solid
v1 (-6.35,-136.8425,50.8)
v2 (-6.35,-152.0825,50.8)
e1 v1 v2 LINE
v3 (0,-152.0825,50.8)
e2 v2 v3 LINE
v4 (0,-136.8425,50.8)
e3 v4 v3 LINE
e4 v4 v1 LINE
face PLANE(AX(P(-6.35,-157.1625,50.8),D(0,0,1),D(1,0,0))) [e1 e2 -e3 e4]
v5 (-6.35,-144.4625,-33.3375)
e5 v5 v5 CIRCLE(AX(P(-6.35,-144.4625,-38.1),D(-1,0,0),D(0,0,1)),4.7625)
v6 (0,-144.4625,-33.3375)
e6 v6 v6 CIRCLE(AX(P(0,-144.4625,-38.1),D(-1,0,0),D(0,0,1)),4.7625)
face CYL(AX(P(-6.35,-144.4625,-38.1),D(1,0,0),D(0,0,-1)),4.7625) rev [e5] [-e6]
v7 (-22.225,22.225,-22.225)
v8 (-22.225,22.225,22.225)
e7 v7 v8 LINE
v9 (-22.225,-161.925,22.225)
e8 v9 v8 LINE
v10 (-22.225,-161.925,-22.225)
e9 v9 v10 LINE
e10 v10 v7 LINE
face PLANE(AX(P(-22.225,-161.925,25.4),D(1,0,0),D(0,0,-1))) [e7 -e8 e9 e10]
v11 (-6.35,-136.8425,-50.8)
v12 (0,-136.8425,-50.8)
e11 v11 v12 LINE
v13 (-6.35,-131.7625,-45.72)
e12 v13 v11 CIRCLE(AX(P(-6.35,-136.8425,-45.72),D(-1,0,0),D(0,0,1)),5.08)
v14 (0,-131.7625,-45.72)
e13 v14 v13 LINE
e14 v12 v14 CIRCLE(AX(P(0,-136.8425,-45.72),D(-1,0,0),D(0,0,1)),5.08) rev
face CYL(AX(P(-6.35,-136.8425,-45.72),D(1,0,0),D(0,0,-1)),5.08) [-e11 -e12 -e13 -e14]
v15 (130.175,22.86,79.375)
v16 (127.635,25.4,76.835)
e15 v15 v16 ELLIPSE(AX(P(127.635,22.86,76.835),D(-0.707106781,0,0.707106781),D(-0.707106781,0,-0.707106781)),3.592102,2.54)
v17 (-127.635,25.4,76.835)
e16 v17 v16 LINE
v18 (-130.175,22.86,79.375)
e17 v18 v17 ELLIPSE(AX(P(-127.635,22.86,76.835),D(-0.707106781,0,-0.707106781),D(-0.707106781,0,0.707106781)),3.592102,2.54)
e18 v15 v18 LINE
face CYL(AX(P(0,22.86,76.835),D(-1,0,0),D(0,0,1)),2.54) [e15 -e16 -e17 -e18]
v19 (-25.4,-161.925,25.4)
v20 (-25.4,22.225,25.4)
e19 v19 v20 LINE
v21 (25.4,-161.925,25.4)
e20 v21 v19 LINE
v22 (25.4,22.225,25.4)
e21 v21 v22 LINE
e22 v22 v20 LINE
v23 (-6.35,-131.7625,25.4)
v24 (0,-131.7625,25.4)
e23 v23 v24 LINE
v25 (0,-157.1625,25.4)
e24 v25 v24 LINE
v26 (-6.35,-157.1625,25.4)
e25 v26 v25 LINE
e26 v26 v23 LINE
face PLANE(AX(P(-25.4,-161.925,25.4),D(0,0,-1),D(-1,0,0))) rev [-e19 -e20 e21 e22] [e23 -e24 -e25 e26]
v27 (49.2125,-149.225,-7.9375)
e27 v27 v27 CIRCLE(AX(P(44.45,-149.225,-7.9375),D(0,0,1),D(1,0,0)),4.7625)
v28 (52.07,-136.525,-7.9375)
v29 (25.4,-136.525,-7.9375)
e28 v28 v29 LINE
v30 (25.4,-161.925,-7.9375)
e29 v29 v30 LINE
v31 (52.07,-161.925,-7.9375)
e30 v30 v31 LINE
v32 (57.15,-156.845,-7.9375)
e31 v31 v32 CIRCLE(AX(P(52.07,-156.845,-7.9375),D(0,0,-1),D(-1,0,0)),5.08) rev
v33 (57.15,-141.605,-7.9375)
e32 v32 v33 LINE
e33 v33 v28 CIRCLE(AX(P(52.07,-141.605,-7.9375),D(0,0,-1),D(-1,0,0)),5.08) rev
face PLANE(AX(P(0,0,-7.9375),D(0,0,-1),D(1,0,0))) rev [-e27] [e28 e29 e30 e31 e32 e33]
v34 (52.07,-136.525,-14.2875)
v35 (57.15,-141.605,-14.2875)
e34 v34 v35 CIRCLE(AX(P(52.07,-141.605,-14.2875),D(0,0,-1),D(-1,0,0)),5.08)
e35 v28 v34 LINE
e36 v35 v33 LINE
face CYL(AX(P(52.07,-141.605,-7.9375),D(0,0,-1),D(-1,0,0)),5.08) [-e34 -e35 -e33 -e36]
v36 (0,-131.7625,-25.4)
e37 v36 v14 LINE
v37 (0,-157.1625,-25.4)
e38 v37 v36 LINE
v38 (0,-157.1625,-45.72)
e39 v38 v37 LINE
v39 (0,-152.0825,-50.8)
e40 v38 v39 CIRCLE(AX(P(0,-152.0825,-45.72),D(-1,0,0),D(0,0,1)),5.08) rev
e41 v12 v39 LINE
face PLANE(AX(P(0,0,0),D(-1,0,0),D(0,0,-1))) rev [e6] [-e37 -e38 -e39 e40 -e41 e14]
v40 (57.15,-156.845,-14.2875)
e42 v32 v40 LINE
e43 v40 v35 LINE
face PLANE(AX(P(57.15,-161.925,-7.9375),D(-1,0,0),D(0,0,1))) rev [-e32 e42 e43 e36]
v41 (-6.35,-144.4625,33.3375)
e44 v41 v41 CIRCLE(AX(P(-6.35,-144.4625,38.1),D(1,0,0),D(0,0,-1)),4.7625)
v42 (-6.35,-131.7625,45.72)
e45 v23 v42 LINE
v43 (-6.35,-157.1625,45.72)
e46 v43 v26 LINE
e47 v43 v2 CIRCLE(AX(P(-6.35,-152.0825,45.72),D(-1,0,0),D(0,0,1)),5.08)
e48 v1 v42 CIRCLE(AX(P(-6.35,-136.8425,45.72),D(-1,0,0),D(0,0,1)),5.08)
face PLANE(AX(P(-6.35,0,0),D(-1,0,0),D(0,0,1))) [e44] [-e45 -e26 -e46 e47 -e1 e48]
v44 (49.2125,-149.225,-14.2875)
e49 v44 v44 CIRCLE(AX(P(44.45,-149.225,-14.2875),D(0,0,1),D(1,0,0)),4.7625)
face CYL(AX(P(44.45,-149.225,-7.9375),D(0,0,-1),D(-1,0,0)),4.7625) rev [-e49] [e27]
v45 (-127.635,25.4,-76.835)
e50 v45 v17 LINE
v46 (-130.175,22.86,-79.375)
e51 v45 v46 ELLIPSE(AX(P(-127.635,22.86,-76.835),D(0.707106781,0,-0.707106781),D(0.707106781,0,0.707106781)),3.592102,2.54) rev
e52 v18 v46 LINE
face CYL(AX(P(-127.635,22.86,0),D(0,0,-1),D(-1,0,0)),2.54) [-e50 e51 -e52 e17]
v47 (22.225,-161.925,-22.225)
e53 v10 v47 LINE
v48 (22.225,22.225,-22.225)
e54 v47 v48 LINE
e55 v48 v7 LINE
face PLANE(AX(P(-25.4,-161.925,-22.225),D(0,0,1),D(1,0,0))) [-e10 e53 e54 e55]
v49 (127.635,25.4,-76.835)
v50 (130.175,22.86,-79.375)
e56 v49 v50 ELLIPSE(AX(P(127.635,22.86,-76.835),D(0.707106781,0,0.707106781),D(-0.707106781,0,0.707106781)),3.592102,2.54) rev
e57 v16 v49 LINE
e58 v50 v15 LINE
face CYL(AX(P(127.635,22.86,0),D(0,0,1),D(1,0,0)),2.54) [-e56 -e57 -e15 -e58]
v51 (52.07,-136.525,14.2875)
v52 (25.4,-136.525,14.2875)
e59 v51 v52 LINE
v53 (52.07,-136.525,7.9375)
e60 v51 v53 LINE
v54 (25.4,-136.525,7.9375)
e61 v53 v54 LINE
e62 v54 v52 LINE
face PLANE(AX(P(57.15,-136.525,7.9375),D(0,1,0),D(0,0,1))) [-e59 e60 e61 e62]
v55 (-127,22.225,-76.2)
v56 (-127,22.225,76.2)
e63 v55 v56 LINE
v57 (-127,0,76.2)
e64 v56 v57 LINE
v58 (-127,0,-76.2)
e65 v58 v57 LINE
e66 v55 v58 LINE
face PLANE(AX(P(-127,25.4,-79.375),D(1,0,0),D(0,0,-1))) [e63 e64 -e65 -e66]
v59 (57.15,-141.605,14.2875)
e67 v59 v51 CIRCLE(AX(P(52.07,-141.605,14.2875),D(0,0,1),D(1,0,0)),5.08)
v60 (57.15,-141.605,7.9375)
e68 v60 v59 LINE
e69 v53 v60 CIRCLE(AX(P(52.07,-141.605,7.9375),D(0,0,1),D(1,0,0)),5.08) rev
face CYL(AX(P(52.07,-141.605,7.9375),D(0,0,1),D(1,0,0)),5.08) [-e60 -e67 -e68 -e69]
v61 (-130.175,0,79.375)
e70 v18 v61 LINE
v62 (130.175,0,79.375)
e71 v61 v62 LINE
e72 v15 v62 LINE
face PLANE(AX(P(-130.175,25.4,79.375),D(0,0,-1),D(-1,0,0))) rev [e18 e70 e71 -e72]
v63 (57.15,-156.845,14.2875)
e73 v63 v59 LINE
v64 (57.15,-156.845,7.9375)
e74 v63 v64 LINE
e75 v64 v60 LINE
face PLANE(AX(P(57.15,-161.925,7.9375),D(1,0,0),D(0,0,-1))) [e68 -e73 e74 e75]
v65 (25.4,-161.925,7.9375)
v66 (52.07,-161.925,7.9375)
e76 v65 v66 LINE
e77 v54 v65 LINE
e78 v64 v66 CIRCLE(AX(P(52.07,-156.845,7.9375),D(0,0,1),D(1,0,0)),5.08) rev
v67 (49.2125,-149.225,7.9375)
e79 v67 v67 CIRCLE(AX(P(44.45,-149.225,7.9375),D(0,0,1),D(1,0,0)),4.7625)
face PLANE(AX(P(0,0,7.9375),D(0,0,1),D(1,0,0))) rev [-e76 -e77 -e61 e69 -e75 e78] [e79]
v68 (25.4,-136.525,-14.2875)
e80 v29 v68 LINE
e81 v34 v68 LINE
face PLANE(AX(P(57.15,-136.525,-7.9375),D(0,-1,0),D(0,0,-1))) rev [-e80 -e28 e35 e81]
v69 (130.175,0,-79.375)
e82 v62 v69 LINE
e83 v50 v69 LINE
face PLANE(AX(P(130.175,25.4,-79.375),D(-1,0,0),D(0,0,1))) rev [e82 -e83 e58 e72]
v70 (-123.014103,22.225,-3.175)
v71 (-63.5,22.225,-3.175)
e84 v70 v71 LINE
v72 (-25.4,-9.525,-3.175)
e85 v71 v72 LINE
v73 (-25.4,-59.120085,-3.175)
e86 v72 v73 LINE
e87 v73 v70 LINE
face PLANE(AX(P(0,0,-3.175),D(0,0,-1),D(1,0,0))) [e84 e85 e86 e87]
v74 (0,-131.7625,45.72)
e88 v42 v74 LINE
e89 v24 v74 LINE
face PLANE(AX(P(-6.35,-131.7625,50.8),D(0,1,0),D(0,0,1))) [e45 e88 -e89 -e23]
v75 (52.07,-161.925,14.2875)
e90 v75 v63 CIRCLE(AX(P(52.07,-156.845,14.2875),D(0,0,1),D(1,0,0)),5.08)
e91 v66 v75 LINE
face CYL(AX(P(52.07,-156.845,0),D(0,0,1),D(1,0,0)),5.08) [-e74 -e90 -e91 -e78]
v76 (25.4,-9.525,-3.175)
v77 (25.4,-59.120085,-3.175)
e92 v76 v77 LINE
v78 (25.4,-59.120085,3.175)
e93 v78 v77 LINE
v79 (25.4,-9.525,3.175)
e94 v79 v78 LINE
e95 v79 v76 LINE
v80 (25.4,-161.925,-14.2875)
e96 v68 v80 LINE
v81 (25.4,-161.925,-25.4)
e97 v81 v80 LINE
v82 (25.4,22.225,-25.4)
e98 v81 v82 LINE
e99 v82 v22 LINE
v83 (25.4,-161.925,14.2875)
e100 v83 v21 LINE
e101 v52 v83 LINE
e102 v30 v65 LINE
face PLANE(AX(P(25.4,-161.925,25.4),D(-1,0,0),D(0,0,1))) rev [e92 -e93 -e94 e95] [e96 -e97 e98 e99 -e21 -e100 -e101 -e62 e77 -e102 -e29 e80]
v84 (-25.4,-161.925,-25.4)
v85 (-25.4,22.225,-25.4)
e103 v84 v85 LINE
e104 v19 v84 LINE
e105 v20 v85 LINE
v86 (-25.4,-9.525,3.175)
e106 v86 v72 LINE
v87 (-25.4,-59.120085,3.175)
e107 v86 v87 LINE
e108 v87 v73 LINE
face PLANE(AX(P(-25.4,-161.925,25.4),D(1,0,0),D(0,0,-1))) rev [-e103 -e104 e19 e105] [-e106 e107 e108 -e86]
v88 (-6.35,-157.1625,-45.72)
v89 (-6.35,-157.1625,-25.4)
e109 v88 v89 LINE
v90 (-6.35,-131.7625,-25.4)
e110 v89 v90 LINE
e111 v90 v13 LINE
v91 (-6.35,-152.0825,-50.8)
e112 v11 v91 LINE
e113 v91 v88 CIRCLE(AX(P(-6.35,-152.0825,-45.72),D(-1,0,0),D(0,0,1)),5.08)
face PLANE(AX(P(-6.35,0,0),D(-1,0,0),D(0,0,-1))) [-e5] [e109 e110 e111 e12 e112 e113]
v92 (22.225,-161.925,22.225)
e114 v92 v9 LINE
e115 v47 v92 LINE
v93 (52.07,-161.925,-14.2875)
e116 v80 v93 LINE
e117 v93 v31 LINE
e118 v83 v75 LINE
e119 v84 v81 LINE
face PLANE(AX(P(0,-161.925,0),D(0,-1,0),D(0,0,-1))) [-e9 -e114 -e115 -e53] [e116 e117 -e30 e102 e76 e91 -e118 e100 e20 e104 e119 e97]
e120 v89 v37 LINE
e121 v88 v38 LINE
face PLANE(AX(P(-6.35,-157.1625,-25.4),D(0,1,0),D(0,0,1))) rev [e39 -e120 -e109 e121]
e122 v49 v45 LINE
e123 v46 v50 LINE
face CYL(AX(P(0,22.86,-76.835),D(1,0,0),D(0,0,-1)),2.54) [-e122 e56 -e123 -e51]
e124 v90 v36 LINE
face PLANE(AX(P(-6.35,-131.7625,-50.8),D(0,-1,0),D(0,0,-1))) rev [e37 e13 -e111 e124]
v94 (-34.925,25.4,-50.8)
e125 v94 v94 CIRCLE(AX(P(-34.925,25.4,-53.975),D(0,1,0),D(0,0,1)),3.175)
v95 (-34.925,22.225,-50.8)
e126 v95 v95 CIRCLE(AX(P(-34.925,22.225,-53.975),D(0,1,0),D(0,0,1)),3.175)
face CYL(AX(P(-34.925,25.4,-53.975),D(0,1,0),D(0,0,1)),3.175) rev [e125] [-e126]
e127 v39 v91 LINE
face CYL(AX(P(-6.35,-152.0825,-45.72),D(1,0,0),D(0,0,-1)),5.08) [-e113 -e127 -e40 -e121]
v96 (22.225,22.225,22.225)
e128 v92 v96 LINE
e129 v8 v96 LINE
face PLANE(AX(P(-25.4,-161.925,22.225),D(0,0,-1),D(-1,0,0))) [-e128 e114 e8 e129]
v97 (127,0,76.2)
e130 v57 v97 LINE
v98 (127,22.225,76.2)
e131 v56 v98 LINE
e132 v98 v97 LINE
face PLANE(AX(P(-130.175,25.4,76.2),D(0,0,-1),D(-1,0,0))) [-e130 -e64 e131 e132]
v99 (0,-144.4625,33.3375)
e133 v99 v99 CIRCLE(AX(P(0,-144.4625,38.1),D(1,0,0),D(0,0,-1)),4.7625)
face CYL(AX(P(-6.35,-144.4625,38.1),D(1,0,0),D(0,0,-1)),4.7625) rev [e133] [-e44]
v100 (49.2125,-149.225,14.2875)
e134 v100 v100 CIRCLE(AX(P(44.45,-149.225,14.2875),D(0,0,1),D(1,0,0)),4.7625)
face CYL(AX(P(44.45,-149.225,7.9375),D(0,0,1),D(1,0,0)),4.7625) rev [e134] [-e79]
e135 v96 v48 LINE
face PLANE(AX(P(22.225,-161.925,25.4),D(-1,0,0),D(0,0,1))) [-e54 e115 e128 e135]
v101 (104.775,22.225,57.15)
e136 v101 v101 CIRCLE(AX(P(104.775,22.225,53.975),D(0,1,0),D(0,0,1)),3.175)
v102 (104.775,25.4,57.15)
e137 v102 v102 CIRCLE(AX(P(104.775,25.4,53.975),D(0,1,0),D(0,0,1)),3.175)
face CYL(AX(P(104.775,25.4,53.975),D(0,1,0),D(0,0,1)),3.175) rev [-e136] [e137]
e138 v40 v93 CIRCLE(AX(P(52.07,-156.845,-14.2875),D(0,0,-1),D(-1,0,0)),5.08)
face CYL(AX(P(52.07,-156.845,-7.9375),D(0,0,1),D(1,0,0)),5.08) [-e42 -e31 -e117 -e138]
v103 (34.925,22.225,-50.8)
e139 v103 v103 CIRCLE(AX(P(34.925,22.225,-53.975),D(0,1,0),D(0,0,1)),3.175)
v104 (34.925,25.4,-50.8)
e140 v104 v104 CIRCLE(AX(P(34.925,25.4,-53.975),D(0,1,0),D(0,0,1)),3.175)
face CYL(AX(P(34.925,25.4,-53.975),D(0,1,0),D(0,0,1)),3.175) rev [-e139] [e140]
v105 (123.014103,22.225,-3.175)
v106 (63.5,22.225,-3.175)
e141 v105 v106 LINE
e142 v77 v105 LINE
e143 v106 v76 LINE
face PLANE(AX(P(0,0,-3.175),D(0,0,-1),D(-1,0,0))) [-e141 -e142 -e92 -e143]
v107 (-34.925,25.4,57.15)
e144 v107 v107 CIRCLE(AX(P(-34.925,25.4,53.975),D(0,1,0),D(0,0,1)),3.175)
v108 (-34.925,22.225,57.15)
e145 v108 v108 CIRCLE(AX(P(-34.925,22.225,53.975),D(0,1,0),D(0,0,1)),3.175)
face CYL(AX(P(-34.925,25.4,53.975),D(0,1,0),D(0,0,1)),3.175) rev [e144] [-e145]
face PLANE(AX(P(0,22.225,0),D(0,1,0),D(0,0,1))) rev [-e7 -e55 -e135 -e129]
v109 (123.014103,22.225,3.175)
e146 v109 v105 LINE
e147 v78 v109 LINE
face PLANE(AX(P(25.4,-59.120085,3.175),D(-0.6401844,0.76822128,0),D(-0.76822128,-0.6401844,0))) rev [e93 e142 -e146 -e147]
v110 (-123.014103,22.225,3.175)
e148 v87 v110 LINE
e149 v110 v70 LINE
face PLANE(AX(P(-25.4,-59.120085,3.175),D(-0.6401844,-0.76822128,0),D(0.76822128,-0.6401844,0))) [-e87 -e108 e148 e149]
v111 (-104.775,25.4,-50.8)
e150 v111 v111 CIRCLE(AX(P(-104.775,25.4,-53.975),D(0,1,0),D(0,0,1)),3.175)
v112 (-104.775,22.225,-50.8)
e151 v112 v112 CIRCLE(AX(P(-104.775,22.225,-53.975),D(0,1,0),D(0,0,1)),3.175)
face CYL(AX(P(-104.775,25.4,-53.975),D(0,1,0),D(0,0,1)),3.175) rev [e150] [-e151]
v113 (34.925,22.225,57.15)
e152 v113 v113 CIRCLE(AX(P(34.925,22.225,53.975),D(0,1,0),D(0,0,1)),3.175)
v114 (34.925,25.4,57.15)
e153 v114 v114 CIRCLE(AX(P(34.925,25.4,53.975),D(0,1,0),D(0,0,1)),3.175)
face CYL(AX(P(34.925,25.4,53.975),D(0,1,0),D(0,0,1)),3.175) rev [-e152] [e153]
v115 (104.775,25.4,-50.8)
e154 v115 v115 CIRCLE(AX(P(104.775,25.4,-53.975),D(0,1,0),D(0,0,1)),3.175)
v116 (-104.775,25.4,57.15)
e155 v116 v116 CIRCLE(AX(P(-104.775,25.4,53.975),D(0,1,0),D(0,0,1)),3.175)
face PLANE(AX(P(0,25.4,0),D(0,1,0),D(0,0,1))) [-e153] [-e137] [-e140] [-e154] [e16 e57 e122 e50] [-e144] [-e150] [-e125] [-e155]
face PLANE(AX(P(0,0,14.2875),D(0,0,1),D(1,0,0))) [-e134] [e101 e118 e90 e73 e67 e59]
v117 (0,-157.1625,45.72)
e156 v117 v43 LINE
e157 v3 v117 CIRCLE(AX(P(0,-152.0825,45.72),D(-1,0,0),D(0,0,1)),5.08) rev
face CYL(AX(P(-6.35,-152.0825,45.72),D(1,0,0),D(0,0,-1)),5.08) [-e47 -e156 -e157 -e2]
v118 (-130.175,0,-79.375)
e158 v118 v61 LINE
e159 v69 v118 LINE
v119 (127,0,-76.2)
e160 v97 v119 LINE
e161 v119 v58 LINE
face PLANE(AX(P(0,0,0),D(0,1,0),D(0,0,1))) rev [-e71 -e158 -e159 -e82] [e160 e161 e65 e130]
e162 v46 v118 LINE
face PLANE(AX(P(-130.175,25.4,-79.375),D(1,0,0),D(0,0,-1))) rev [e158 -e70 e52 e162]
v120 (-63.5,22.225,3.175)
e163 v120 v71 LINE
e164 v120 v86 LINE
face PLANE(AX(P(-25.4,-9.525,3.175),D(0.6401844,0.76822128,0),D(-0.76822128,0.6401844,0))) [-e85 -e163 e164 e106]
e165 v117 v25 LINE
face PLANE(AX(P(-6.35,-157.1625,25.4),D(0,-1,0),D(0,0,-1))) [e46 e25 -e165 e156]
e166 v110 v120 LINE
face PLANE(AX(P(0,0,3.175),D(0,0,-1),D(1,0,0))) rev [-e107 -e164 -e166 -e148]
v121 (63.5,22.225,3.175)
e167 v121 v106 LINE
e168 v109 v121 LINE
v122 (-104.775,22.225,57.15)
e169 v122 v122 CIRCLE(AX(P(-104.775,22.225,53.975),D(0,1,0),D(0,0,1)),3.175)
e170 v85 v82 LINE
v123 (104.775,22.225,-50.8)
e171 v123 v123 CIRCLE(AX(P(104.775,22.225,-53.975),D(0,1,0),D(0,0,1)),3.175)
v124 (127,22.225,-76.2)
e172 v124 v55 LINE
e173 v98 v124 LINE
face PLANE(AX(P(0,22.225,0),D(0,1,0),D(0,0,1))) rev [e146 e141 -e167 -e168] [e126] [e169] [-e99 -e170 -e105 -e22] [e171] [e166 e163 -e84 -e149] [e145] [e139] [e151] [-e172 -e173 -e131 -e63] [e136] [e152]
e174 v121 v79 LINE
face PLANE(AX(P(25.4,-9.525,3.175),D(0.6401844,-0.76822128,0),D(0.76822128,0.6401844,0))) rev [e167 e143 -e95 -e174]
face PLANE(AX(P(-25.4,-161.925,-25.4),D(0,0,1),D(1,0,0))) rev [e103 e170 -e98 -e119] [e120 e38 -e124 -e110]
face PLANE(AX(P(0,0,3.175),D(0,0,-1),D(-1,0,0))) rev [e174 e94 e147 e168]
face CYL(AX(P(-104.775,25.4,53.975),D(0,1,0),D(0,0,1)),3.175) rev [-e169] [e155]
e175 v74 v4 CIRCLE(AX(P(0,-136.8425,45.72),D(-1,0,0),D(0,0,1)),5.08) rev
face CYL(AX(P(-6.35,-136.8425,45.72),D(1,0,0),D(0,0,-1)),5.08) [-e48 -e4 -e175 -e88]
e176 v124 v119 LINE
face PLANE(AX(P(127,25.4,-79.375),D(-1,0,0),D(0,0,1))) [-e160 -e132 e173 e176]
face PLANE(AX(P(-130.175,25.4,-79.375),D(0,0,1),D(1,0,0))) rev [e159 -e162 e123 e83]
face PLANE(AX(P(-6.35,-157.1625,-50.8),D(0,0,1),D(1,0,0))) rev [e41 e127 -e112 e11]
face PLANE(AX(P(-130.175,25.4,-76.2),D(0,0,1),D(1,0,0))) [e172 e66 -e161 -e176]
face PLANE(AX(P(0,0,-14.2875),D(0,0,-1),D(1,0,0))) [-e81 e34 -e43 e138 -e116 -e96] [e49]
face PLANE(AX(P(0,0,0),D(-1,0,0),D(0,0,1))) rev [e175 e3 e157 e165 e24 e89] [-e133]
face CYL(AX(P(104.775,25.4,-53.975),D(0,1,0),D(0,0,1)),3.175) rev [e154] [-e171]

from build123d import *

# Parameters (mm, degrees)
SKETCH1_W                   = 260.35
SKETCH1_H                   = 158.75
BOSS_EXTRUDE1_DEPTH         = 25.4
SHELL1_T                    = -3.175
SKETCH2_W                   = 50.8
SKETCH2_H                   = 50.8
BOSS_EXTRUDE2_DEPTH         = 184.15
SHELL2_START                = -161.925
SHELL2_OUTLINE_W            = 44.45
SHELL2_OUTLINE_H            = 44.45
SHELL2_DEPTH                = 184.15
BOSS_EXTRUDE3_DEPTH         = 3.175
FILLET1_R                   = 2.54
SKETCH6_W                   = 31.75
SKETCH6_H                   = 25.4
SKETCH6_R                   = 4.7625
BOSS_EXTRUDE4_DEPTH         = 6.35
FILLET2_R                   = 5.08
SKETCH7_W                   = 25.4
SKETCH7_H                   = 25.4
SKETCH7_R                   = 4.7625
BOSS_EXTRUDE5_DEPTH         = 6.35
FILLET3_R                   = 5.08
FILLET3_OF_MIRROR3_R        = 5.08
F_1_4_0_25_DIAMETER_HOLE1_D = 6.35


# Read off the part's stored shape, not the designer's step: Shell2
with BuildPart() as part:
    # Sketch1 → Boss-Extrude1 (new body)
    with BuildSketch(Plane(origin=(0, 0, 0), x_dir=(1, 0, 0), z_dir=(0, 1, 0))):
        Rectangle(SKETCH1_W, SKETCH1_H)
    extrude(amount=BOSS_EXTRUDE1_DEPTH)

    # Shell1
    shell1_openings = [part.faces().sort_by_distance(p)[0] for p in [
        (0, 0, 0),
    ]]
    offset(amount=SHELL1_T, openings=shell1_openings, kind=Kind.INTERSECTION)

    # Sketch2 → Boss-Extrude2 (add)
    with BuildSketch(Plane.XZ.offset(-22.225)):
        Rectangle(SKETCH2_W, SKETCH2_H)
    extrude(amount=BOSS_EXTRUDE2_DEPTH)

    # Shell2 outline → Shell2 (cut)
    with BuildSketch(Plane(origin=(0, 0, 0), x_dir=(1, 0, 0), z_dir=(0, 1, 0)).offset(SHELL2_START)):
        Rectangle(SHELL2_OUTLINE_W, SHELL2_OUTLINE_H)
    extrude(amount=SHELL2_DEPTH, mode=Mode.SUBTRACT)

    # Sketch4 → Boss-Extrude3 (add, symmetric)
    with BuildSketch(Plane.XY):
        Polygon((25.4, -9.525), (63.5, 22.225), (123.01410253, 22.225), (25.4, -59.120085442), align=None)
    boss_extrude3 = extrude(amount=BOSS_EXTRUDE3_DEPTH, both=True)

    # Mirror1: Boss-Extrude3 across plane
    add(boss_extrude3.mirror(Plane(origin=(0, 0, 0), x_dir=(0, 0, 1), z_dir=(1, 0, 0))))

    # Fillet1
    fillet1_edges = [part.edges().sort_by_distance(p)[0] for p in [
        (-130.175, 25.4, 0),
        (0, 25.4, 79.375),
        (130.175, 25.4, 0),
        (0, 25.4, -79.375),
    ]]
    fillet(fillet1_edges, radius=FILLET1_R)

    # Sketch6 → Boss-Extrude4 (add)
    with BuildSketch(Plane.XY.offset(14.2875)):
        with Locations((41.275, -149.225)):
            Rectangle(SKETCH6_W, SKETCH6_H)
        with Locations((44.45, -149.225)):
            Circle(SKETCH6_R, mode=Mode.SUBTRACT)
    boss_extrude4 = extrude(amount=-BOSS_EXTRUDE4_DEPTH)

    # Mirror2: Boss-Extrude4 across plane
    add(boss_extrude4.mirror(Plane.XY))

    # Fillet2
    fillet2_edges = [part.edges().sort_by_distance(p)[0] for p in [
        (57.15, -161.925, -11.1125),
        (57.15, -136.525, -11.1125),
        (57.15, -136.525, 11.1125),
        (57.15, -161.925, 11.1125),
    ]]
    fillet(fillet2_edges, radius=FILLET2_R)

    # Sketch7 → Boss-Extrude5 (add)
    with BuildSketch(Plane(origin=(0, 0, 0), x_dir=(0, 0, -1), z_dir=(1, 0, 0))):
        with Locations((-38.1, -144.4625)):
            Rectangle(SKETCH7_W, SKETCH7_H)
        with Locations((-38.1, -144.4625)):
            Circle(SKETCH7_R, mode=Mode.SUBTRACT)
    boss_extrude5 = extrude(amount=-BOSS_EXTRUDE5_DEPTH)

    # Fillet3
    fillet3_edges = [part.edges().sort_by_distance(p)[0] for p in [
        (-3.175, -157.1625, 50.8),
        (-3.175, -131.7625, 50.8),
    ]]
    fillet(fillet3_edges, radius=FILLET3_R)

    # Mirror3: Boss-Extrude5 across plane
    add(boss_extrude5.mirror(Plane.XY))

    # Fillet3 of Mirror3
    fillet3_of_mirror3_edges = [part.edges().sort_by_distance(p)[0] for p in [
        (-3.175, -157.1625, -50.8),
        (-3.175, -131.7625, -50.8),
    ]]
    fillet(fillet3_of_mirror3_edges, radius=FILLET3_OF_MIRROR3_R)

    # 1/4 (0.25) Diameter Hole1 (through all)
    with Locations(Plane(origin=(0, 25.4, 0), x_dir=(1, 0, 0), z_dir=(0, 1, 0))):
        with Locations((-104.775, 53.975), (-34.925, 53.975), (34.925, 53.975), (104.775, 53.975)):
            f_1_4_0_25_diameter_hole1 = Hole(F_1_4_0_25_DIAMETER_HOLE1_D / 2)

    # Mirror4: 1/4 (0.25) Diameter Hole1 across plane
    add(f_1_4_0_25_diameter_hole1.mirror(Plane.XY), mode=Mode.SUBTRACT)


solid = part.part
